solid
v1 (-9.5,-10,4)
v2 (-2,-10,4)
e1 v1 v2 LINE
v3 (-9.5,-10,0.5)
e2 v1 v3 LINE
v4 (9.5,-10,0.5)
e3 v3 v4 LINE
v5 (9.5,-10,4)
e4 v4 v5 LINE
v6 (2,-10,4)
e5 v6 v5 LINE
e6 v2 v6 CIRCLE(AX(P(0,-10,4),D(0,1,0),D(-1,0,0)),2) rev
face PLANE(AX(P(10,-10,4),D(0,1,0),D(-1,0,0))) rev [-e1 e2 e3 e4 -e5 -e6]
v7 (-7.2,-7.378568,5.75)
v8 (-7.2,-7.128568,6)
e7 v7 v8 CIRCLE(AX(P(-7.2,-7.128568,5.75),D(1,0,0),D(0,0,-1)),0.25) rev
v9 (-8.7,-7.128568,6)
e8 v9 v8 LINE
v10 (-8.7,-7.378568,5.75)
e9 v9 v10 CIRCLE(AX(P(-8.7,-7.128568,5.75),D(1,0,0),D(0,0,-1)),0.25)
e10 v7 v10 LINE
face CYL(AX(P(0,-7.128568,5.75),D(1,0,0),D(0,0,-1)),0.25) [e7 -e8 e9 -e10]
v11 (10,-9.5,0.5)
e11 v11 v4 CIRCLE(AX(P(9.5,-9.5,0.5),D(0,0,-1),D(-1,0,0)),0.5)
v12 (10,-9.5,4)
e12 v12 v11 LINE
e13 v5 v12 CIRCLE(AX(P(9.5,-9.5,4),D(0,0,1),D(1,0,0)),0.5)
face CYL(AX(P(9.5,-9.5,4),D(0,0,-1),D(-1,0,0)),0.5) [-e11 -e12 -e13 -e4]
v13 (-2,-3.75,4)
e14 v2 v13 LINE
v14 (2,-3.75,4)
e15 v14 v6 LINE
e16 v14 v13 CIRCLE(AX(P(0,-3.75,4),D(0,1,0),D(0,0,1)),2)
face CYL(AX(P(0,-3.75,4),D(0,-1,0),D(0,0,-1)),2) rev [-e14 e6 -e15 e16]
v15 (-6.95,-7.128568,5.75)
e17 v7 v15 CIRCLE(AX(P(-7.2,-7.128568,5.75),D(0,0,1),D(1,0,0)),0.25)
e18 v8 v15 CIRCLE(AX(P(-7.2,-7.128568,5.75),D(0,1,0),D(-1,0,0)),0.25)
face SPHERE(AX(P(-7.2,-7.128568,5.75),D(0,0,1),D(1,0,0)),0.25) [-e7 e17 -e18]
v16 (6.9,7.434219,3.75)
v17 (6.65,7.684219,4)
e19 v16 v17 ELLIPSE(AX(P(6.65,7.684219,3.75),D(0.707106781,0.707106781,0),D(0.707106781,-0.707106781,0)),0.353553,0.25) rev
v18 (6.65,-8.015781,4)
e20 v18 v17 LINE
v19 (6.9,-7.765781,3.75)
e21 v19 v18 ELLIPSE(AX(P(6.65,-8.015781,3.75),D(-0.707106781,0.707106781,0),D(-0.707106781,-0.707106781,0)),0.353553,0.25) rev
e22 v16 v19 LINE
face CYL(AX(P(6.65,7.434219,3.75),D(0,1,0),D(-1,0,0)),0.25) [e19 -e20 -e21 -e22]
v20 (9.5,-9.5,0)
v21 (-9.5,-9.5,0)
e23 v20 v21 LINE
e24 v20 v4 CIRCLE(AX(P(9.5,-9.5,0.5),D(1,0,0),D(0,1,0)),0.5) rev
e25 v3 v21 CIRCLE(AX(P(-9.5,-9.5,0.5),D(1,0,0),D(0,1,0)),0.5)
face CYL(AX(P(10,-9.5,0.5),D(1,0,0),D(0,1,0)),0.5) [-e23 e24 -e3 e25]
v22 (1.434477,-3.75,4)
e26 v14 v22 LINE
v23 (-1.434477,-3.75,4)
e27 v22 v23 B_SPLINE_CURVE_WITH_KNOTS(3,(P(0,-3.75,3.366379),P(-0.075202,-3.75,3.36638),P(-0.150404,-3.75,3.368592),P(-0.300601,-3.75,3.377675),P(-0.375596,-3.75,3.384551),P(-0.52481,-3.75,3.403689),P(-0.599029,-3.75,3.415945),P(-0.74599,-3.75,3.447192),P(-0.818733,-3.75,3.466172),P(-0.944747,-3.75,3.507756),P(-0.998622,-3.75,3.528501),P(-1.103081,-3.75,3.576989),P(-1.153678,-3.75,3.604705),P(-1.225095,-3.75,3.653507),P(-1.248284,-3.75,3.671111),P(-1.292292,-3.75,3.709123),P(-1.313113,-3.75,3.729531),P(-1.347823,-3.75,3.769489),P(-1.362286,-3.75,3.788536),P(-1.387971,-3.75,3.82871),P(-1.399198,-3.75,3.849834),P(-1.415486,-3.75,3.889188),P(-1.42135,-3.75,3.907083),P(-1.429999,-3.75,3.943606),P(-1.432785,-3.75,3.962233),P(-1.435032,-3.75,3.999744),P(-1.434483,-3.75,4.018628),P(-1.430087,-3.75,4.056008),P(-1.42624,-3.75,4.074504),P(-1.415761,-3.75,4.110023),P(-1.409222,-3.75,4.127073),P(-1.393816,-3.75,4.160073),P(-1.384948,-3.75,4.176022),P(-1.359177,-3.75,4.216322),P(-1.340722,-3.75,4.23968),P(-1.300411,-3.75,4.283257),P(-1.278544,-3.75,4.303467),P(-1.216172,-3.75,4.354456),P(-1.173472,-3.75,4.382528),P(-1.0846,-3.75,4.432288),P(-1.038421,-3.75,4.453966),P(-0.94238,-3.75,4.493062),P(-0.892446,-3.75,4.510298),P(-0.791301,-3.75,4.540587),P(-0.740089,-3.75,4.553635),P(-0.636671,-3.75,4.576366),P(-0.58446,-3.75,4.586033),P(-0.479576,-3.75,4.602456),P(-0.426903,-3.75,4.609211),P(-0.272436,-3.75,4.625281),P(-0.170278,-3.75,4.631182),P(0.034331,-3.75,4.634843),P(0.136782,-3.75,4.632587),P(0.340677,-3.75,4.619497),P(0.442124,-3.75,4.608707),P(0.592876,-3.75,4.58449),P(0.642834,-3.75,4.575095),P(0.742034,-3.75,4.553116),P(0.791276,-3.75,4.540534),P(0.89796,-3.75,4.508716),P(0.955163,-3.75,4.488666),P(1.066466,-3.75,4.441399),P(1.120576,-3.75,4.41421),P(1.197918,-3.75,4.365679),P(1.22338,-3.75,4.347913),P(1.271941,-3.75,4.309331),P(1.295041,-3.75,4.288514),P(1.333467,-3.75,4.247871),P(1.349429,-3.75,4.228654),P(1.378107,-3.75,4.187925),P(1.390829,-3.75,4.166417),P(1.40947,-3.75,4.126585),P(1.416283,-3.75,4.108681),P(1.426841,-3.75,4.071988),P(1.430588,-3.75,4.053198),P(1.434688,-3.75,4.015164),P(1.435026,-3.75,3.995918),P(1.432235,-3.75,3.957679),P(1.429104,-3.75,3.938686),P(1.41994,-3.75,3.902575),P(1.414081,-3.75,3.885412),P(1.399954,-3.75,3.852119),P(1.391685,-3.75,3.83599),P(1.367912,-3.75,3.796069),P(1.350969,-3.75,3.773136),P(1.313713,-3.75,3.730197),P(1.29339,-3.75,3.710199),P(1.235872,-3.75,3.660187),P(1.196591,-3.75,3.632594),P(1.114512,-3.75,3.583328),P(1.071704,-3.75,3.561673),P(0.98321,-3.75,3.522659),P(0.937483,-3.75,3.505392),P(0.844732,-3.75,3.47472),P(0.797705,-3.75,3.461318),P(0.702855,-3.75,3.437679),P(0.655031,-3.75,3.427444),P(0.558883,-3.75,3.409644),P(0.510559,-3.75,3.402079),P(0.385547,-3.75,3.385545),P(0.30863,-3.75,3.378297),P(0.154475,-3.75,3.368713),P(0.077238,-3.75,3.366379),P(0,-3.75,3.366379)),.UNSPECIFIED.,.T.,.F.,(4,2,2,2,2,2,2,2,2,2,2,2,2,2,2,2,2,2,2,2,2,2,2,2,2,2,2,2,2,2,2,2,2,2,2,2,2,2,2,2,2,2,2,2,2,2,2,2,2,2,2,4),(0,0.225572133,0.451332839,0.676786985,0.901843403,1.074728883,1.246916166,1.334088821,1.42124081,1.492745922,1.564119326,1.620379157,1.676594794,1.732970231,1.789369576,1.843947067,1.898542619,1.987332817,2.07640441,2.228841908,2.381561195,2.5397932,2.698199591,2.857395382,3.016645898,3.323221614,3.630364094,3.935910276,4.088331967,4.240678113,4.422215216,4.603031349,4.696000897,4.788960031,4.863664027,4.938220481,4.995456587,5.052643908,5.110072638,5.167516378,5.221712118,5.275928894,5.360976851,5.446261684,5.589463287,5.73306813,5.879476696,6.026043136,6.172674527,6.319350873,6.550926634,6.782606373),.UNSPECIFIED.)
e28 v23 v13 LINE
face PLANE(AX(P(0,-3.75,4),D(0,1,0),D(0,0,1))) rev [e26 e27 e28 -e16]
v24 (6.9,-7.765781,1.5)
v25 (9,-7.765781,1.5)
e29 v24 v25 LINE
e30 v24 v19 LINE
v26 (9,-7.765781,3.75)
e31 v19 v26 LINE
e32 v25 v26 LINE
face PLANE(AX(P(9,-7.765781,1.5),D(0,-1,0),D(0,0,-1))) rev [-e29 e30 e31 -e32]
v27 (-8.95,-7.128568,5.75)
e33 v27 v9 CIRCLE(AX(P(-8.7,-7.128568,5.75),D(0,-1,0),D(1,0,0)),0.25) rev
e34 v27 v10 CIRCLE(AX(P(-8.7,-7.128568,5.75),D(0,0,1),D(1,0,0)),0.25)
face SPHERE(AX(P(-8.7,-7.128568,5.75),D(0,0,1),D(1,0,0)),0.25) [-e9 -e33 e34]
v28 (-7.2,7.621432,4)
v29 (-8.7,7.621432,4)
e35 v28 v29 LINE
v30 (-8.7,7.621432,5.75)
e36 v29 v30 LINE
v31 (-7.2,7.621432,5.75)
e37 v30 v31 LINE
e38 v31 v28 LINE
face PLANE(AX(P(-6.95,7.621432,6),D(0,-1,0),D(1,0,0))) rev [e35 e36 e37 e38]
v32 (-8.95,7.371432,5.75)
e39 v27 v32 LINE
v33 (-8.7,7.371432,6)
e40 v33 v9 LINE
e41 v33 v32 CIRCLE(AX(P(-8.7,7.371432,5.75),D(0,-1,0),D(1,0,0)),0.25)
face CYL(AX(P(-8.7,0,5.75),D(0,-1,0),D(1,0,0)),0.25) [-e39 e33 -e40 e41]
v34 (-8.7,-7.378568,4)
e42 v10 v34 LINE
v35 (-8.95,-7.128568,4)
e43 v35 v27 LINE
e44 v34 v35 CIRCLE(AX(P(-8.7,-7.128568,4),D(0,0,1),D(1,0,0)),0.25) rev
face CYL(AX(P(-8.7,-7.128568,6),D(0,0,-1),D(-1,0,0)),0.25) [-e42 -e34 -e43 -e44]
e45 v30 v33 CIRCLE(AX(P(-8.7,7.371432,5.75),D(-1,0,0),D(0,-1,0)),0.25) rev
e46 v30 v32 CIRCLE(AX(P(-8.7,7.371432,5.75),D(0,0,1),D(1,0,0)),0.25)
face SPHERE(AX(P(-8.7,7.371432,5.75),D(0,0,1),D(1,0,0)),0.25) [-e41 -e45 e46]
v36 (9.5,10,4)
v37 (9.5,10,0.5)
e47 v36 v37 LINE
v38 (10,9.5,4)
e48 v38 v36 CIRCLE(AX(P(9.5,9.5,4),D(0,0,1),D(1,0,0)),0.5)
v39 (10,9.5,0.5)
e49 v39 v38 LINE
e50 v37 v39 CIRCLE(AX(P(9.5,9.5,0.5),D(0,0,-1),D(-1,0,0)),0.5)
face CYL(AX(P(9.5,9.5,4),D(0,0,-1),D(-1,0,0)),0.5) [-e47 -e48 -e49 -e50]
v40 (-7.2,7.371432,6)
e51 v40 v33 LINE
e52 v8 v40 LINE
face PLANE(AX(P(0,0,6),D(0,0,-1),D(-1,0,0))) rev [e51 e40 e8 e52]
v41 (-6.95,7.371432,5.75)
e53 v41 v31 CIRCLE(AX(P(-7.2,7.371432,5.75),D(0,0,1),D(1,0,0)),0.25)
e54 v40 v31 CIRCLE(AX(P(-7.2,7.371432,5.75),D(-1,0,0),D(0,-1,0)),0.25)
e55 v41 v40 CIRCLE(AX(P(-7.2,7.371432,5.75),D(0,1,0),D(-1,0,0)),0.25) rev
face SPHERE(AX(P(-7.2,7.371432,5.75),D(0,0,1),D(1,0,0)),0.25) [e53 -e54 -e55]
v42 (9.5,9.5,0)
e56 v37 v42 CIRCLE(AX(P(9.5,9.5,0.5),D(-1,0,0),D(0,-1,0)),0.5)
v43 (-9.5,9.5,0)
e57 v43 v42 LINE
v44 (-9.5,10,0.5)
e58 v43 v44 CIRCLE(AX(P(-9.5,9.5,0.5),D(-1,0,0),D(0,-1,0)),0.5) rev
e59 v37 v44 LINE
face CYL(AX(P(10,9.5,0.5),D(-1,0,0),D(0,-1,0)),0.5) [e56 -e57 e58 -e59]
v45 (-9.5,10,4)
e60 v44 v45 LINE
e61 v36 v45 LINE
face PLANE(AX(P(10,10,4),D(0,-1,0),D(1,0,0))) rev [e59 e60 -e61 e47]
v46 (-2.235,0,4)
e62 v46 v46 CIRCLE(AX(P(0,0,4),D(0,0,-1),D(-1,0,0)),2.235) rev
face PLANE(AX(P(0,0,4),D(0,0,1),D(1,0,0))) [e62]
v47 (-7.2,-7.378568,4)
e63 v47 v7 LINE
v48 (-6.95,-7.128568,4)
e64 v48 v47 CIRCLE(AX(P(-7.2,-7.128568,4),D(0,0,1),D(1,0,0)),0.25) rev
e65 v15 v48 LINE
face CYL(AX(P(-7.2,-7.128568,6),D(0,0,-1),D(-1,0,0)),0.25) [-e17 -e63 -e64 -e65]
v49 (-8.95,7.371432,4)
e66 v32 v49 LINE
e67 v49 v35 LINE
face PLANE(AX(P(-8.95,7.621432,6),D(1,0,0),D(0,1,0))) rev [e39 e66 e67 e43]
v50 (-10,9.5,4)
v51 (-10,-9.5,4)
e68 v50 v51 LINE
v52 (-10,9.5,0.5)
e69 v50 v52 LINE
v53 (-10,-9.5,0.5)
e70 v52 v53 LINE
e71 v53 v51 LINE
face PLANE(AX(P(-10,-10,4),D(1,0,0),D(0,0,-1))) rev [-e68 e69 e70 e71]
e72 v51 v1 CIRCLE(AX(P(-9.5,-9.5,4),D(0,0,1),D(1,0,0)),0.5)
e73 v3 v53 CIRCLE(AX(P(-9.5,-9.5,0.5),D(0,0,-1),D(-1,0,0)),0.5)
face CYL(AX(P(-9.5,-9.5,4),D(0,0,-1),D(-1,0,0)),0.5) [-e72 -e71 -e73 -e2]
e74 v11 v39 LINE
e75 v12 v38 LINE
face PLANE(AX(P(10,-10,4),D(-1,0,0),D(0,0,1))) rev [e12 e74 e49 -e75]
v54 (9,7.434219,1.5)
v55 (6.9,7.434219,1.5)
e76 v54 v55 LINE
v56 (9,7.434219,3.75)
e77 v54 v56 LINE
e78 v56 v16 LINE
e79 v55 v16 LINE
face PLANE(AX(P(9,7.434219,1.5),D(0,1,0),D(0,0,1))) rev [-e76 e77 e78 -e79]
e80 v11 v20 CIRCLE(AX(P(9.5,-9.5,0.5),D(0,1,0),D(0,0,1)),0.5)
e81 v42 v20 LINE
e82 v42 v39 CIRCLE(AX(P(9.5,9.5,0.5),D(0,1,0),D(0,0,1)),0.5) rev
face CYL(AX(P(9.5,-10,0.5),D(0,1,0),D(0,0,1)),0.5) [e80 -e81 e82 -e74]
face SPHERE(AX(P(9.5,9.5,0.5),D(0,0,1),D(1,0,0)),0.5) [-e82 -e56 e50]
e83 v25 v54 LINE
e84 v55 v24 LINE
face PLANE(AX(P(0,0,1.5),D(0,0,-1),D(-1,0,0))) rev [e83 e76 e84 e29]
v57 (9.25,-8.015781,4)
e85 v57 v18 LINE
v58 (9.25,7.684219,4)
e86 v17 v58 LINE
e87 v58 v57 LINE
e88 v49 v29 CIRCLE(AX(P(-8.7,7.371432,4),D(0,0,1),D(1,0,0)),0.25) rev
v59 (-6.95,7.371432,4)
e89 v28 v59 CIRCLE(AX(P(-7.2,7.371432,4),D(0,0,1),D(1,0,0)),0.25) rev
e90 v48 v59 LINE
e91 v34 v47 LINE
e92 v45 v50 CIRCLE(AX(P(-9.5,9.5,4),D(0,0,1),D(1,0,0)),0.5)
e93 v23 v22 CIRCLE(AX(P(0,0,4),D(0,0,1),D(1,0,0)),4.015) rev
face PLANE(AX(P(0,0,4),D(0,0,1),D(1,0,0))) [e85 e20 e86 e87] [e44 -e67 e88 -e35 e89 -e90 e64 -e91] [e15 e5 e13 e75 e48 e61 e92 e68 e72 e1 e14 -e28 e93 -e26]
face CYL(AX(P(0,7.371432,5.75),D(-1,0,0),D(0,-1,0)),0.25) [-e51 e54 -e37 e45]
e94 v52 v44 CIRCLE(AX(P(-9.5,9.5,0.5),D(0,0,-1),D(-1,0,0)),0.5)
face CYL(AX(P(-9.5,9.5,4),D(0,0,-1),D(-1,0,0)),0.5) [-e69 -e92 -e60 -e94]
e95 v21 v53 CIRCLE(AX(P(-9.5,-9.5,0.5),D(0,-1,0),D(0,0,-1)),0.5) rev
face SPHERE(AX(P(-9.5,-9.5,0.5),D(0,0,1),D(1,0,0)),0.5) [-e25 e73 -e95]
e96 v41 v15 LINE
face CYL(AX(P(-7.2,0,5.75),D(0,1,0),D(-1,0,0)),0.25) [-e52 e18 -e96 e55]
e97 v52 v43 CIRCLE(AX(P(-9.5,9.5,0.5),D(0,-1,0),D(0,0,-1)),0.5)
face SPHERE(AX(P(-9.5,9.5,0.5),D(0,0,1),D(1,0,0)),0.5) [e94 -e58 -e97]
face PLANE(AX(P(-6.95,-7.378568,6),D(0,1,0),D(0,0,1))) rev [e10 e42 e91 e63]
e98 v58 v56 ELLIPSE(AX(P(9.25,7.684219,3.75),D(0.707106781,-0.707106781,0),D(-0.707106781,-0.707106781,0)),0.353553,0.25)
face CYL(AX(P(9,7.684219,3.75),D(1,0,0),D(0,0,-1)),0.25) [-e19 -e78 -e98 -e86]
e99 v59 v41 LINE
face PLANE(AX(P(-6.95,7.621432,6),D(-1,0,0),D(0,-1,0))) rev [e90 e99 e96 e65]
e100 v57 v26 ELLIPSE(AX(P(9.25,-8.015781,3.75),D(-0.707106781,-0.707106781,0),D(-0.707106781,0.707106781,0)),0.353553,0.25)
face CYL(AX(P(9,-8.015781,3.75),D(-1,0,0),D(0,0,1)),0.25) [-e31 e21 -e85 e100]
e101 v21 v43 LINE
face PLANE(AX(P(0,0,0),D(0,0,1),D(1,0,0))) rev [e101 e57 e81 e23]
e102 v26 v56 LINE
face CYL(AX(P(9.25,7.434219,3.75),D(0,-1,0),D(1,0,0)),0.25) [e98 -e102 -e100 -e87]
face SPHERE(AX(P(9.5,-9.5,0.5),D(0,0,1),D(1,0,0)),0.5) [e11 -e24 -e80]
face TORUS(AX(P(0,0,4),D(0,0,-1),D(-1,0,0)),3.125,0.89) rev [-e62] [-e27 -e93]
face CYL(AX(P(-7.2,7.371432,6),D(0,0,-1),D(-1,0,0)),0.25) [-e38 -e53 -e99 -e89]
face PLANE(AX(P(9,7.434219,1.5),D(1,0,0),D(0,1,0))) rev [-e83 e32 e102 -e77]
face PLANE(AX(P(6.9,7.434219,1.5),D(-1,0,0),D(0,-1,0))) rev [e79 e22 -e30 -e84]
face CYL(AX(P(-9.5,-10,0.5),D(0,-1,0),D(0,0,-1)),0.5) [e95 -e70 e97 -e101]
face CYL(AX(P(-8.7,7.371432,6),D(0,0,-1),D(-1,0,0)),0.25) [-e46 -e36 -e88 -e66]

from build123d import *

# Parameters (mm, degrees)
SKETCH1_W               = 20
SKETCH1_H               = 20
BOSS_EXTRUDE1_DEPTH     = 4
SKETCH4_R               = 0.89
CUT_EXTRUDE1_DEPTH      = 0.25
CUT_EXTRUDE1_DEPTH_BACK = 8
SKETCH6_R               = 2
SKETCH7_W               = 2
SKETCH7_H               = 15
BOSS_EXTRUDE2_DEPTH     = 2
SKETCH8_W               = 2.1
SKETCH8_H               = 15.2
CUT_EXTRUDE2_DEPTH      = 2.5
FILLET1_R               = 0.25
FILLET2_R               = 0.25
FILLET3_R               = 0.25
FILLET5_R               = 0.5
FILLET6_R               = 0.5


with BuildPart() as part:
    # Sketch1 → Boss-Extrude1 (new body)
    with BuildSketch(Plane.XY):
        Rectangle(SKETCH1_W, SKETCH1_H)
    extrude(amount=BOSS_EXTRUDE1_DEPTH)

    # Sketch4 → Cut-Revolve1 (revolve, cut)
    with BuildSketch(Plane(origin=(0, 0, 0), x_dir=(1, 0, 0), z_dir=(0, 1, 0)), mode=Mode.PRIVATE) as cut_revolve1_sk:
        with Locations((3.125, -4)):
            Circle(SKETCH4_R)
    revolve(cut_revolve1_sk.sketch.rotate(Axis((0, 0, 0), (0, 0, 1)), 180), axis=Axis((0, 0, 0), (0, 0, 1)), mode=Mode.SUBTRACT)

    # Sketch6 → Cut-Extrude1 (cut, two sides: drawn at the far end of the back side and taken through both)
    with BuildSketch(Plane(origin=(0, -4, 0), x_dir=(1, 0, 0), z_dir=(0, 1, 0)).offset(-CUT_EXTRUDE1_DEPTH_BACK)):
        with Locations((0, -4)):
            Circle(SKETCH6_R)
    extrude(amount=CUT_EXTRUDE1_DEPTH + CUT_EXTRUDE1_DEPTH_BACK, mode=Mode.SUBTRACT)

    # Sketch7 → Boss-Extrude2 (add)
    with BuildSketch(Plane.XY.offset(4)):
        with Locations((-7.95, 0.121431972)):
            Rectangle(SKETCH7_W, SKETCH7_H)
    extrude(amount=BOSS_EXTRUDE2_DEPTH)

    # Sketch8 → Cut-Extrude2 (cut)
    with BuildSketch(Plane.XY.offset(4)):
        with Locations((7.95, -0.165781366)):
            Rectangle(SKETCH8_W, SKETCH8_H)
    extrude(amount=-CUT_EXTRUDE2_DEPTH, mode=Mode.SUBTRACT)

    # Fillet1
    fillet1_edges = [part.edges().sort_by_distance(p)[0] for p in [
        (-8.95, 0.121431972, 6),
        (-7.95, -7.378568028, 6),
        (-6.95, 0.121431972, 6),
        (-7.95, 7.621431972, 6),
    ]]
    fillet(fillet1_edges, radius=FILLET1_R)

    # Fillet2
    # the kernel refuses this fillet: 0.25 mm, written as the material it takes off along each edge
    with BuildSketch(Plane(origin=(-7.2, -7.128568028, 5.75), x_dir=(0, -1, 0), z_dir=(1, 0, 0))) as fillet2_piece_1_section:
        Polygon((0, 0), (FILLET2_R, 0), (FILLET2_R, -FILLET2_R), (0, -FILLET2_R), align=None)
    fillet2_piece_1 = extrude(amount=FILLET2_R, mode=Mode.PRIVATE)
    fillet2_piece_1 = fillet2_piece_1 - Plane(origin=(-7.2, -7.128568028, 5.75), x_dir=(0, 0.7071067811865475, -0.7071067811865475), z_dir=(1, 0, 0)) * Sphere(FILLET2_R, mode=Mode.PRIVATE)
    add(fillet2_piece_1, mode=Mode.SUBTRACT)
    with BuildSketch(Plane(origin=(-8.7, -7.128568028, 5.75), x_dir=(-1, 0, 0), z_dir=(0, -1, 0))) as fillet2_piece_2_section:
        Polygon((0, 0), (FILLET2_R, 0), (FILLET2_R, -FILLET2_R), (0, -FILLET2_R), align=None)
    fillet2_piece_2 = extrude(amount=FILLET2_R, mode=Mode.PRIVATE)
    fillet2_piece_2 = fillet2_piece_2 - Plane(origin=(-8.7, -7.128568028, 5.75), x_dir=(0.7071067811865475, 0, -0.7071067811865475), z_dir=(0, -1, 0)) * Sphere(FILLET2_R, mode=Mode.PRIVATE)
    add(fillet2_piece_2, mode=Mode.SUBTRACT)
    with BuildSketch(Plane(origin=(-7.2, 7.371431972, 5.75), x_dir=(0, 1, 0), z_dir=(1, 0, 0))) as fillet2_piece_3_section:
        Polygon((0, 0), (FILLET2_R, 0), (FILLET2_R, FILLET2_R), (0, FILLET2_R), align=None)
    fillet2_piece_3 = extrude(amount=FILLET2_R, mode=Mode.PRIVATE)
    fillet2_piece_3 = fillet2_piece_3 - Plane(origin=(-7.2, 7.371431972, 5.75), x_dir=(0, -0.7071067811865475, -0.7071067811865475), z_dir=(1, 0, 0)) * Sphere(FILLET2_R, mode=Mode.PRIVATE)
    add(fillet2_piece_3, mode=Mode.SUBTRACT)
    with BuildSketch(Plane(origin=(-8.7, 7.371431972, 5.75), x_dir=(-1, 0, 0), z_dir=(0, 1, 0))) as fillet2_piece_4_section:
        Polygon((0, 0), (FILLET2_R, 0), (FILLET2_R, FILLET2_R), (0, FILLET2_R), align=None)
    fillet2_piece_4 = extrude(amount=FILLET2_R, mode=Mode.PRIVATE)
    fillet2_piece_4 = fillet2_piece_4 - Plane(origin=(-8.7, 7.371431972, 5.75), x_dir=(0.7071067811865475, 0, -0.7071067811865475), z_dir=(0, 1, 0)) * Sphere(FILLET2_R, mode=Mode.PRIVATE)
    add(fillet2_piece_4, mode=Mode.SUBTRACT)
    with BuildSketch(Plane(origin=(-8.95, 7.621431972, 4), x_dir=(1, 0, 0), z_dir=(0, 0, 1)), Plane(origin=(-6.95, 7.621431972, 4), x_dir=(0, -1, 0), z_dir=(0, 0, 1))) as fillet2_piece_5:
        with BuildLine():
            CenterArc((FILLET2_R, -FILLET2_R), FILLET2_R, 90, 90)
            Line((0, -FILLET2_R), (0, 0))
            Line((0, 0), (FILLET2_R, 0))
        make_face()
    extrude(amount=1.75, mode=Mode.SUBTRACT)
    with BuildSketch(Plane(origin=(-6.95, -7.378568028, 4), x_dir=(0, 1, 0), z_dir=(0, 0, 1)), Plane(origin=(-8.95, -7.378568028, 4), x_dir=(1, 0, 0), z_dir=(0, 0, 1))) as fillet2_piece_6:
        with BuildLine():
            CenterArc((FILLET2_R, FILLET2_R), FILLET2_R, 180, 90)
            Line((0, FILLET2_R), (0, 0))
            Line((0, 0), (FILLET2_R, 0))
        make_face()
    extrude(amount=1.75, mode=Mode.SUBTRACT)

    # Fillet3
    fillet3_edges = [part.edges().sort_by_distance(p)[0] for p in [
        (6.9, -0.165781366, 4),
        (7.95, -7.765781366, 4),
        (9, -0.165781366, 4),
        (7.95, 7.434218634, 4),
    ]]
    fillet(fillet3_edges, radius=FILLET3_R)

    # Fillet5
    fillet5_edges = [part.edges().sort_by_distance(p)[0] for p in [
        (0, 10, 0),
        (10, 0, 0),
        (0, -10, 0),
        (-10, 0, 0),
    ]]
    fillet(fillet5_edges, radius=FILLET5_R)

    # Fillet6
    # the kernel refuses this fillet: 0.5 mm, written as the material it takes off along each edge
    with BuildSketch(Plane(origin=(-9.5, 9.5, 0.5), x_dir=(-1, 0, 0), z_dir=(0, 1, 0))) as fillet6_piece_1_section:
        Polygon((0, 0), (FILLET6_R, 0), (FILLET6_R, -FILLET6_R), (0, -FILLET6_R), align=None)
    fillet6_piece_1 = extrude(amount=FILLET6_R, mode=Mode.PRIVATE)
    fillet6_piece_1 = fillet6_piece_1 - Plane(origin=(-9.5, 9.5, 0.5), x_dir=(0.7071067811865475, 0, 0.7071067811865475), z_dir=(0, 1, 0)) * Sphere(FILLET6_R, mode=Mode.PRIVATE)
    add(fillet6_piece_1, mode=Mode.SUBTRACT)
    with BuildSketch(Plane(origin=(9.5, 9.5, 0.5), x_dir=(0, 1, 0), z_dir=(1, 0, 0))) as fillet6_piece_2_section:
        Polygon((0, 0), (FILLET6_R, 0), (FILLET6_R, -FILLET6_R), (0, -FILLET6_R), align=None)
    fillet6_piece_2 = extrude(amount=FILLET6_R, mode=Mode.PRIVATE)
    fillet6_piece_2 = fillet6_piece_2 - Plane(origin=(9.5, 9.5, 0.5), x_dir=(0, -0.7071067811865475, 0.7071067811865475), z_dir=(1, 0, 0)) * Sphere(FILLET6_R, mode=Mode.PRIVATE)
    add(fillet6_piece_2, mode=Mode.SUBTRACT)
    with BuildSketch(Plane(origin=(-9.5, -9.5, 0.5), x_dir=(-1, 0, 0), z_dir=(0, -1, 0))) as fillet6_piece_3_section:
        Polygon((0, 0), (FILLET6_R, 0), (FILLET6_R, FILLET6_R), (0, FILLET6_R), align=None)
    fillet6_piece_3 = extrude(amount=FILLET6_R, mode=Mode.PRIVATE)
    fillet6_piece_3 = fillet6_piece_3 - Plane(origin=(-9.5, -9.5, 0.5), x_dir=(0.7071067811865475, 0, 0.7071067811865475), z_dir=(0, -1, 0)) * Sphere(FILLET6_R, mode=Mode.PRIVATE)
    add(fillet6_piece_3, mode=Mode.SUBTRACT)
    with BuildSketch(Plane(origin=(9.5, -9.5, 0.5), x_dir=(0, -1, 0), z_dir=(1, 0, 0))) as fillet6_piece_4_section:
        Polygon((0, 0), (FILLET6_R, 0), (FILLET6_R, FILLET6_R), (0, FILLET6_R), align=None)
    fillet6_piece_4 = extrude(amount=FILLET6_R, mode=Mode.PRIVATE)
    fillet6_piece_4 = fillet6_piece_4 - Plane(origin=(9.5, -9.5, 0.5), x_dir=(0, 0.7071067811865475, 0.7071067811865475), z_dir=(1, 0, 0)) * Sphere(FILLET6_R, mode=Mode.PRIVATE)
    add(fillet6_piece_4, mode=Mode.SUBTRACT)
    with BuildSketch(Plane(origin=(-10, 10, 0.5), x_dir=(1, 0, 0), z_dir=(0, 0, 1)), Plane(origin=(10, 10, 0.5), x_dir=(0, -1, 0), z_dir=(0, 0, 1))) as fillet6_piece_5:
        with BuildLine():
            CenterArc((FILLET6_R, -FILLET6_R), FILLET6_R, 90, 90)
            Line((0, -FILLET6_R), (0, 0))
            Line((0, 0), (FILLET6_R, 0))
        make_face()
    extrude(amount=4.75, mode=Mode.SUBTRACT)
    with BuildSketch(Plane(origin=(10, -10, 0.5), x_dir=(0, 1, 0), z_dir=(0, 0, 1)), Plane(origin=(-10, -10, 0.5), x_dir=(1, 0, 0), z_dir=(0, 0, 1))) as fillet6_piece_6:
        with BuildLine():
            CenterArc((FILLET6_R, FILLET6_R), FILLET6_R, 180, 90)
            Line((0, FILLET6_R), (0, 0))
            Line((0, 0), (FILLET6_R, 0))
        make_face()
    extrude(amount=4.75, mode=Mode.SUBTRACT)


solid = part.part
